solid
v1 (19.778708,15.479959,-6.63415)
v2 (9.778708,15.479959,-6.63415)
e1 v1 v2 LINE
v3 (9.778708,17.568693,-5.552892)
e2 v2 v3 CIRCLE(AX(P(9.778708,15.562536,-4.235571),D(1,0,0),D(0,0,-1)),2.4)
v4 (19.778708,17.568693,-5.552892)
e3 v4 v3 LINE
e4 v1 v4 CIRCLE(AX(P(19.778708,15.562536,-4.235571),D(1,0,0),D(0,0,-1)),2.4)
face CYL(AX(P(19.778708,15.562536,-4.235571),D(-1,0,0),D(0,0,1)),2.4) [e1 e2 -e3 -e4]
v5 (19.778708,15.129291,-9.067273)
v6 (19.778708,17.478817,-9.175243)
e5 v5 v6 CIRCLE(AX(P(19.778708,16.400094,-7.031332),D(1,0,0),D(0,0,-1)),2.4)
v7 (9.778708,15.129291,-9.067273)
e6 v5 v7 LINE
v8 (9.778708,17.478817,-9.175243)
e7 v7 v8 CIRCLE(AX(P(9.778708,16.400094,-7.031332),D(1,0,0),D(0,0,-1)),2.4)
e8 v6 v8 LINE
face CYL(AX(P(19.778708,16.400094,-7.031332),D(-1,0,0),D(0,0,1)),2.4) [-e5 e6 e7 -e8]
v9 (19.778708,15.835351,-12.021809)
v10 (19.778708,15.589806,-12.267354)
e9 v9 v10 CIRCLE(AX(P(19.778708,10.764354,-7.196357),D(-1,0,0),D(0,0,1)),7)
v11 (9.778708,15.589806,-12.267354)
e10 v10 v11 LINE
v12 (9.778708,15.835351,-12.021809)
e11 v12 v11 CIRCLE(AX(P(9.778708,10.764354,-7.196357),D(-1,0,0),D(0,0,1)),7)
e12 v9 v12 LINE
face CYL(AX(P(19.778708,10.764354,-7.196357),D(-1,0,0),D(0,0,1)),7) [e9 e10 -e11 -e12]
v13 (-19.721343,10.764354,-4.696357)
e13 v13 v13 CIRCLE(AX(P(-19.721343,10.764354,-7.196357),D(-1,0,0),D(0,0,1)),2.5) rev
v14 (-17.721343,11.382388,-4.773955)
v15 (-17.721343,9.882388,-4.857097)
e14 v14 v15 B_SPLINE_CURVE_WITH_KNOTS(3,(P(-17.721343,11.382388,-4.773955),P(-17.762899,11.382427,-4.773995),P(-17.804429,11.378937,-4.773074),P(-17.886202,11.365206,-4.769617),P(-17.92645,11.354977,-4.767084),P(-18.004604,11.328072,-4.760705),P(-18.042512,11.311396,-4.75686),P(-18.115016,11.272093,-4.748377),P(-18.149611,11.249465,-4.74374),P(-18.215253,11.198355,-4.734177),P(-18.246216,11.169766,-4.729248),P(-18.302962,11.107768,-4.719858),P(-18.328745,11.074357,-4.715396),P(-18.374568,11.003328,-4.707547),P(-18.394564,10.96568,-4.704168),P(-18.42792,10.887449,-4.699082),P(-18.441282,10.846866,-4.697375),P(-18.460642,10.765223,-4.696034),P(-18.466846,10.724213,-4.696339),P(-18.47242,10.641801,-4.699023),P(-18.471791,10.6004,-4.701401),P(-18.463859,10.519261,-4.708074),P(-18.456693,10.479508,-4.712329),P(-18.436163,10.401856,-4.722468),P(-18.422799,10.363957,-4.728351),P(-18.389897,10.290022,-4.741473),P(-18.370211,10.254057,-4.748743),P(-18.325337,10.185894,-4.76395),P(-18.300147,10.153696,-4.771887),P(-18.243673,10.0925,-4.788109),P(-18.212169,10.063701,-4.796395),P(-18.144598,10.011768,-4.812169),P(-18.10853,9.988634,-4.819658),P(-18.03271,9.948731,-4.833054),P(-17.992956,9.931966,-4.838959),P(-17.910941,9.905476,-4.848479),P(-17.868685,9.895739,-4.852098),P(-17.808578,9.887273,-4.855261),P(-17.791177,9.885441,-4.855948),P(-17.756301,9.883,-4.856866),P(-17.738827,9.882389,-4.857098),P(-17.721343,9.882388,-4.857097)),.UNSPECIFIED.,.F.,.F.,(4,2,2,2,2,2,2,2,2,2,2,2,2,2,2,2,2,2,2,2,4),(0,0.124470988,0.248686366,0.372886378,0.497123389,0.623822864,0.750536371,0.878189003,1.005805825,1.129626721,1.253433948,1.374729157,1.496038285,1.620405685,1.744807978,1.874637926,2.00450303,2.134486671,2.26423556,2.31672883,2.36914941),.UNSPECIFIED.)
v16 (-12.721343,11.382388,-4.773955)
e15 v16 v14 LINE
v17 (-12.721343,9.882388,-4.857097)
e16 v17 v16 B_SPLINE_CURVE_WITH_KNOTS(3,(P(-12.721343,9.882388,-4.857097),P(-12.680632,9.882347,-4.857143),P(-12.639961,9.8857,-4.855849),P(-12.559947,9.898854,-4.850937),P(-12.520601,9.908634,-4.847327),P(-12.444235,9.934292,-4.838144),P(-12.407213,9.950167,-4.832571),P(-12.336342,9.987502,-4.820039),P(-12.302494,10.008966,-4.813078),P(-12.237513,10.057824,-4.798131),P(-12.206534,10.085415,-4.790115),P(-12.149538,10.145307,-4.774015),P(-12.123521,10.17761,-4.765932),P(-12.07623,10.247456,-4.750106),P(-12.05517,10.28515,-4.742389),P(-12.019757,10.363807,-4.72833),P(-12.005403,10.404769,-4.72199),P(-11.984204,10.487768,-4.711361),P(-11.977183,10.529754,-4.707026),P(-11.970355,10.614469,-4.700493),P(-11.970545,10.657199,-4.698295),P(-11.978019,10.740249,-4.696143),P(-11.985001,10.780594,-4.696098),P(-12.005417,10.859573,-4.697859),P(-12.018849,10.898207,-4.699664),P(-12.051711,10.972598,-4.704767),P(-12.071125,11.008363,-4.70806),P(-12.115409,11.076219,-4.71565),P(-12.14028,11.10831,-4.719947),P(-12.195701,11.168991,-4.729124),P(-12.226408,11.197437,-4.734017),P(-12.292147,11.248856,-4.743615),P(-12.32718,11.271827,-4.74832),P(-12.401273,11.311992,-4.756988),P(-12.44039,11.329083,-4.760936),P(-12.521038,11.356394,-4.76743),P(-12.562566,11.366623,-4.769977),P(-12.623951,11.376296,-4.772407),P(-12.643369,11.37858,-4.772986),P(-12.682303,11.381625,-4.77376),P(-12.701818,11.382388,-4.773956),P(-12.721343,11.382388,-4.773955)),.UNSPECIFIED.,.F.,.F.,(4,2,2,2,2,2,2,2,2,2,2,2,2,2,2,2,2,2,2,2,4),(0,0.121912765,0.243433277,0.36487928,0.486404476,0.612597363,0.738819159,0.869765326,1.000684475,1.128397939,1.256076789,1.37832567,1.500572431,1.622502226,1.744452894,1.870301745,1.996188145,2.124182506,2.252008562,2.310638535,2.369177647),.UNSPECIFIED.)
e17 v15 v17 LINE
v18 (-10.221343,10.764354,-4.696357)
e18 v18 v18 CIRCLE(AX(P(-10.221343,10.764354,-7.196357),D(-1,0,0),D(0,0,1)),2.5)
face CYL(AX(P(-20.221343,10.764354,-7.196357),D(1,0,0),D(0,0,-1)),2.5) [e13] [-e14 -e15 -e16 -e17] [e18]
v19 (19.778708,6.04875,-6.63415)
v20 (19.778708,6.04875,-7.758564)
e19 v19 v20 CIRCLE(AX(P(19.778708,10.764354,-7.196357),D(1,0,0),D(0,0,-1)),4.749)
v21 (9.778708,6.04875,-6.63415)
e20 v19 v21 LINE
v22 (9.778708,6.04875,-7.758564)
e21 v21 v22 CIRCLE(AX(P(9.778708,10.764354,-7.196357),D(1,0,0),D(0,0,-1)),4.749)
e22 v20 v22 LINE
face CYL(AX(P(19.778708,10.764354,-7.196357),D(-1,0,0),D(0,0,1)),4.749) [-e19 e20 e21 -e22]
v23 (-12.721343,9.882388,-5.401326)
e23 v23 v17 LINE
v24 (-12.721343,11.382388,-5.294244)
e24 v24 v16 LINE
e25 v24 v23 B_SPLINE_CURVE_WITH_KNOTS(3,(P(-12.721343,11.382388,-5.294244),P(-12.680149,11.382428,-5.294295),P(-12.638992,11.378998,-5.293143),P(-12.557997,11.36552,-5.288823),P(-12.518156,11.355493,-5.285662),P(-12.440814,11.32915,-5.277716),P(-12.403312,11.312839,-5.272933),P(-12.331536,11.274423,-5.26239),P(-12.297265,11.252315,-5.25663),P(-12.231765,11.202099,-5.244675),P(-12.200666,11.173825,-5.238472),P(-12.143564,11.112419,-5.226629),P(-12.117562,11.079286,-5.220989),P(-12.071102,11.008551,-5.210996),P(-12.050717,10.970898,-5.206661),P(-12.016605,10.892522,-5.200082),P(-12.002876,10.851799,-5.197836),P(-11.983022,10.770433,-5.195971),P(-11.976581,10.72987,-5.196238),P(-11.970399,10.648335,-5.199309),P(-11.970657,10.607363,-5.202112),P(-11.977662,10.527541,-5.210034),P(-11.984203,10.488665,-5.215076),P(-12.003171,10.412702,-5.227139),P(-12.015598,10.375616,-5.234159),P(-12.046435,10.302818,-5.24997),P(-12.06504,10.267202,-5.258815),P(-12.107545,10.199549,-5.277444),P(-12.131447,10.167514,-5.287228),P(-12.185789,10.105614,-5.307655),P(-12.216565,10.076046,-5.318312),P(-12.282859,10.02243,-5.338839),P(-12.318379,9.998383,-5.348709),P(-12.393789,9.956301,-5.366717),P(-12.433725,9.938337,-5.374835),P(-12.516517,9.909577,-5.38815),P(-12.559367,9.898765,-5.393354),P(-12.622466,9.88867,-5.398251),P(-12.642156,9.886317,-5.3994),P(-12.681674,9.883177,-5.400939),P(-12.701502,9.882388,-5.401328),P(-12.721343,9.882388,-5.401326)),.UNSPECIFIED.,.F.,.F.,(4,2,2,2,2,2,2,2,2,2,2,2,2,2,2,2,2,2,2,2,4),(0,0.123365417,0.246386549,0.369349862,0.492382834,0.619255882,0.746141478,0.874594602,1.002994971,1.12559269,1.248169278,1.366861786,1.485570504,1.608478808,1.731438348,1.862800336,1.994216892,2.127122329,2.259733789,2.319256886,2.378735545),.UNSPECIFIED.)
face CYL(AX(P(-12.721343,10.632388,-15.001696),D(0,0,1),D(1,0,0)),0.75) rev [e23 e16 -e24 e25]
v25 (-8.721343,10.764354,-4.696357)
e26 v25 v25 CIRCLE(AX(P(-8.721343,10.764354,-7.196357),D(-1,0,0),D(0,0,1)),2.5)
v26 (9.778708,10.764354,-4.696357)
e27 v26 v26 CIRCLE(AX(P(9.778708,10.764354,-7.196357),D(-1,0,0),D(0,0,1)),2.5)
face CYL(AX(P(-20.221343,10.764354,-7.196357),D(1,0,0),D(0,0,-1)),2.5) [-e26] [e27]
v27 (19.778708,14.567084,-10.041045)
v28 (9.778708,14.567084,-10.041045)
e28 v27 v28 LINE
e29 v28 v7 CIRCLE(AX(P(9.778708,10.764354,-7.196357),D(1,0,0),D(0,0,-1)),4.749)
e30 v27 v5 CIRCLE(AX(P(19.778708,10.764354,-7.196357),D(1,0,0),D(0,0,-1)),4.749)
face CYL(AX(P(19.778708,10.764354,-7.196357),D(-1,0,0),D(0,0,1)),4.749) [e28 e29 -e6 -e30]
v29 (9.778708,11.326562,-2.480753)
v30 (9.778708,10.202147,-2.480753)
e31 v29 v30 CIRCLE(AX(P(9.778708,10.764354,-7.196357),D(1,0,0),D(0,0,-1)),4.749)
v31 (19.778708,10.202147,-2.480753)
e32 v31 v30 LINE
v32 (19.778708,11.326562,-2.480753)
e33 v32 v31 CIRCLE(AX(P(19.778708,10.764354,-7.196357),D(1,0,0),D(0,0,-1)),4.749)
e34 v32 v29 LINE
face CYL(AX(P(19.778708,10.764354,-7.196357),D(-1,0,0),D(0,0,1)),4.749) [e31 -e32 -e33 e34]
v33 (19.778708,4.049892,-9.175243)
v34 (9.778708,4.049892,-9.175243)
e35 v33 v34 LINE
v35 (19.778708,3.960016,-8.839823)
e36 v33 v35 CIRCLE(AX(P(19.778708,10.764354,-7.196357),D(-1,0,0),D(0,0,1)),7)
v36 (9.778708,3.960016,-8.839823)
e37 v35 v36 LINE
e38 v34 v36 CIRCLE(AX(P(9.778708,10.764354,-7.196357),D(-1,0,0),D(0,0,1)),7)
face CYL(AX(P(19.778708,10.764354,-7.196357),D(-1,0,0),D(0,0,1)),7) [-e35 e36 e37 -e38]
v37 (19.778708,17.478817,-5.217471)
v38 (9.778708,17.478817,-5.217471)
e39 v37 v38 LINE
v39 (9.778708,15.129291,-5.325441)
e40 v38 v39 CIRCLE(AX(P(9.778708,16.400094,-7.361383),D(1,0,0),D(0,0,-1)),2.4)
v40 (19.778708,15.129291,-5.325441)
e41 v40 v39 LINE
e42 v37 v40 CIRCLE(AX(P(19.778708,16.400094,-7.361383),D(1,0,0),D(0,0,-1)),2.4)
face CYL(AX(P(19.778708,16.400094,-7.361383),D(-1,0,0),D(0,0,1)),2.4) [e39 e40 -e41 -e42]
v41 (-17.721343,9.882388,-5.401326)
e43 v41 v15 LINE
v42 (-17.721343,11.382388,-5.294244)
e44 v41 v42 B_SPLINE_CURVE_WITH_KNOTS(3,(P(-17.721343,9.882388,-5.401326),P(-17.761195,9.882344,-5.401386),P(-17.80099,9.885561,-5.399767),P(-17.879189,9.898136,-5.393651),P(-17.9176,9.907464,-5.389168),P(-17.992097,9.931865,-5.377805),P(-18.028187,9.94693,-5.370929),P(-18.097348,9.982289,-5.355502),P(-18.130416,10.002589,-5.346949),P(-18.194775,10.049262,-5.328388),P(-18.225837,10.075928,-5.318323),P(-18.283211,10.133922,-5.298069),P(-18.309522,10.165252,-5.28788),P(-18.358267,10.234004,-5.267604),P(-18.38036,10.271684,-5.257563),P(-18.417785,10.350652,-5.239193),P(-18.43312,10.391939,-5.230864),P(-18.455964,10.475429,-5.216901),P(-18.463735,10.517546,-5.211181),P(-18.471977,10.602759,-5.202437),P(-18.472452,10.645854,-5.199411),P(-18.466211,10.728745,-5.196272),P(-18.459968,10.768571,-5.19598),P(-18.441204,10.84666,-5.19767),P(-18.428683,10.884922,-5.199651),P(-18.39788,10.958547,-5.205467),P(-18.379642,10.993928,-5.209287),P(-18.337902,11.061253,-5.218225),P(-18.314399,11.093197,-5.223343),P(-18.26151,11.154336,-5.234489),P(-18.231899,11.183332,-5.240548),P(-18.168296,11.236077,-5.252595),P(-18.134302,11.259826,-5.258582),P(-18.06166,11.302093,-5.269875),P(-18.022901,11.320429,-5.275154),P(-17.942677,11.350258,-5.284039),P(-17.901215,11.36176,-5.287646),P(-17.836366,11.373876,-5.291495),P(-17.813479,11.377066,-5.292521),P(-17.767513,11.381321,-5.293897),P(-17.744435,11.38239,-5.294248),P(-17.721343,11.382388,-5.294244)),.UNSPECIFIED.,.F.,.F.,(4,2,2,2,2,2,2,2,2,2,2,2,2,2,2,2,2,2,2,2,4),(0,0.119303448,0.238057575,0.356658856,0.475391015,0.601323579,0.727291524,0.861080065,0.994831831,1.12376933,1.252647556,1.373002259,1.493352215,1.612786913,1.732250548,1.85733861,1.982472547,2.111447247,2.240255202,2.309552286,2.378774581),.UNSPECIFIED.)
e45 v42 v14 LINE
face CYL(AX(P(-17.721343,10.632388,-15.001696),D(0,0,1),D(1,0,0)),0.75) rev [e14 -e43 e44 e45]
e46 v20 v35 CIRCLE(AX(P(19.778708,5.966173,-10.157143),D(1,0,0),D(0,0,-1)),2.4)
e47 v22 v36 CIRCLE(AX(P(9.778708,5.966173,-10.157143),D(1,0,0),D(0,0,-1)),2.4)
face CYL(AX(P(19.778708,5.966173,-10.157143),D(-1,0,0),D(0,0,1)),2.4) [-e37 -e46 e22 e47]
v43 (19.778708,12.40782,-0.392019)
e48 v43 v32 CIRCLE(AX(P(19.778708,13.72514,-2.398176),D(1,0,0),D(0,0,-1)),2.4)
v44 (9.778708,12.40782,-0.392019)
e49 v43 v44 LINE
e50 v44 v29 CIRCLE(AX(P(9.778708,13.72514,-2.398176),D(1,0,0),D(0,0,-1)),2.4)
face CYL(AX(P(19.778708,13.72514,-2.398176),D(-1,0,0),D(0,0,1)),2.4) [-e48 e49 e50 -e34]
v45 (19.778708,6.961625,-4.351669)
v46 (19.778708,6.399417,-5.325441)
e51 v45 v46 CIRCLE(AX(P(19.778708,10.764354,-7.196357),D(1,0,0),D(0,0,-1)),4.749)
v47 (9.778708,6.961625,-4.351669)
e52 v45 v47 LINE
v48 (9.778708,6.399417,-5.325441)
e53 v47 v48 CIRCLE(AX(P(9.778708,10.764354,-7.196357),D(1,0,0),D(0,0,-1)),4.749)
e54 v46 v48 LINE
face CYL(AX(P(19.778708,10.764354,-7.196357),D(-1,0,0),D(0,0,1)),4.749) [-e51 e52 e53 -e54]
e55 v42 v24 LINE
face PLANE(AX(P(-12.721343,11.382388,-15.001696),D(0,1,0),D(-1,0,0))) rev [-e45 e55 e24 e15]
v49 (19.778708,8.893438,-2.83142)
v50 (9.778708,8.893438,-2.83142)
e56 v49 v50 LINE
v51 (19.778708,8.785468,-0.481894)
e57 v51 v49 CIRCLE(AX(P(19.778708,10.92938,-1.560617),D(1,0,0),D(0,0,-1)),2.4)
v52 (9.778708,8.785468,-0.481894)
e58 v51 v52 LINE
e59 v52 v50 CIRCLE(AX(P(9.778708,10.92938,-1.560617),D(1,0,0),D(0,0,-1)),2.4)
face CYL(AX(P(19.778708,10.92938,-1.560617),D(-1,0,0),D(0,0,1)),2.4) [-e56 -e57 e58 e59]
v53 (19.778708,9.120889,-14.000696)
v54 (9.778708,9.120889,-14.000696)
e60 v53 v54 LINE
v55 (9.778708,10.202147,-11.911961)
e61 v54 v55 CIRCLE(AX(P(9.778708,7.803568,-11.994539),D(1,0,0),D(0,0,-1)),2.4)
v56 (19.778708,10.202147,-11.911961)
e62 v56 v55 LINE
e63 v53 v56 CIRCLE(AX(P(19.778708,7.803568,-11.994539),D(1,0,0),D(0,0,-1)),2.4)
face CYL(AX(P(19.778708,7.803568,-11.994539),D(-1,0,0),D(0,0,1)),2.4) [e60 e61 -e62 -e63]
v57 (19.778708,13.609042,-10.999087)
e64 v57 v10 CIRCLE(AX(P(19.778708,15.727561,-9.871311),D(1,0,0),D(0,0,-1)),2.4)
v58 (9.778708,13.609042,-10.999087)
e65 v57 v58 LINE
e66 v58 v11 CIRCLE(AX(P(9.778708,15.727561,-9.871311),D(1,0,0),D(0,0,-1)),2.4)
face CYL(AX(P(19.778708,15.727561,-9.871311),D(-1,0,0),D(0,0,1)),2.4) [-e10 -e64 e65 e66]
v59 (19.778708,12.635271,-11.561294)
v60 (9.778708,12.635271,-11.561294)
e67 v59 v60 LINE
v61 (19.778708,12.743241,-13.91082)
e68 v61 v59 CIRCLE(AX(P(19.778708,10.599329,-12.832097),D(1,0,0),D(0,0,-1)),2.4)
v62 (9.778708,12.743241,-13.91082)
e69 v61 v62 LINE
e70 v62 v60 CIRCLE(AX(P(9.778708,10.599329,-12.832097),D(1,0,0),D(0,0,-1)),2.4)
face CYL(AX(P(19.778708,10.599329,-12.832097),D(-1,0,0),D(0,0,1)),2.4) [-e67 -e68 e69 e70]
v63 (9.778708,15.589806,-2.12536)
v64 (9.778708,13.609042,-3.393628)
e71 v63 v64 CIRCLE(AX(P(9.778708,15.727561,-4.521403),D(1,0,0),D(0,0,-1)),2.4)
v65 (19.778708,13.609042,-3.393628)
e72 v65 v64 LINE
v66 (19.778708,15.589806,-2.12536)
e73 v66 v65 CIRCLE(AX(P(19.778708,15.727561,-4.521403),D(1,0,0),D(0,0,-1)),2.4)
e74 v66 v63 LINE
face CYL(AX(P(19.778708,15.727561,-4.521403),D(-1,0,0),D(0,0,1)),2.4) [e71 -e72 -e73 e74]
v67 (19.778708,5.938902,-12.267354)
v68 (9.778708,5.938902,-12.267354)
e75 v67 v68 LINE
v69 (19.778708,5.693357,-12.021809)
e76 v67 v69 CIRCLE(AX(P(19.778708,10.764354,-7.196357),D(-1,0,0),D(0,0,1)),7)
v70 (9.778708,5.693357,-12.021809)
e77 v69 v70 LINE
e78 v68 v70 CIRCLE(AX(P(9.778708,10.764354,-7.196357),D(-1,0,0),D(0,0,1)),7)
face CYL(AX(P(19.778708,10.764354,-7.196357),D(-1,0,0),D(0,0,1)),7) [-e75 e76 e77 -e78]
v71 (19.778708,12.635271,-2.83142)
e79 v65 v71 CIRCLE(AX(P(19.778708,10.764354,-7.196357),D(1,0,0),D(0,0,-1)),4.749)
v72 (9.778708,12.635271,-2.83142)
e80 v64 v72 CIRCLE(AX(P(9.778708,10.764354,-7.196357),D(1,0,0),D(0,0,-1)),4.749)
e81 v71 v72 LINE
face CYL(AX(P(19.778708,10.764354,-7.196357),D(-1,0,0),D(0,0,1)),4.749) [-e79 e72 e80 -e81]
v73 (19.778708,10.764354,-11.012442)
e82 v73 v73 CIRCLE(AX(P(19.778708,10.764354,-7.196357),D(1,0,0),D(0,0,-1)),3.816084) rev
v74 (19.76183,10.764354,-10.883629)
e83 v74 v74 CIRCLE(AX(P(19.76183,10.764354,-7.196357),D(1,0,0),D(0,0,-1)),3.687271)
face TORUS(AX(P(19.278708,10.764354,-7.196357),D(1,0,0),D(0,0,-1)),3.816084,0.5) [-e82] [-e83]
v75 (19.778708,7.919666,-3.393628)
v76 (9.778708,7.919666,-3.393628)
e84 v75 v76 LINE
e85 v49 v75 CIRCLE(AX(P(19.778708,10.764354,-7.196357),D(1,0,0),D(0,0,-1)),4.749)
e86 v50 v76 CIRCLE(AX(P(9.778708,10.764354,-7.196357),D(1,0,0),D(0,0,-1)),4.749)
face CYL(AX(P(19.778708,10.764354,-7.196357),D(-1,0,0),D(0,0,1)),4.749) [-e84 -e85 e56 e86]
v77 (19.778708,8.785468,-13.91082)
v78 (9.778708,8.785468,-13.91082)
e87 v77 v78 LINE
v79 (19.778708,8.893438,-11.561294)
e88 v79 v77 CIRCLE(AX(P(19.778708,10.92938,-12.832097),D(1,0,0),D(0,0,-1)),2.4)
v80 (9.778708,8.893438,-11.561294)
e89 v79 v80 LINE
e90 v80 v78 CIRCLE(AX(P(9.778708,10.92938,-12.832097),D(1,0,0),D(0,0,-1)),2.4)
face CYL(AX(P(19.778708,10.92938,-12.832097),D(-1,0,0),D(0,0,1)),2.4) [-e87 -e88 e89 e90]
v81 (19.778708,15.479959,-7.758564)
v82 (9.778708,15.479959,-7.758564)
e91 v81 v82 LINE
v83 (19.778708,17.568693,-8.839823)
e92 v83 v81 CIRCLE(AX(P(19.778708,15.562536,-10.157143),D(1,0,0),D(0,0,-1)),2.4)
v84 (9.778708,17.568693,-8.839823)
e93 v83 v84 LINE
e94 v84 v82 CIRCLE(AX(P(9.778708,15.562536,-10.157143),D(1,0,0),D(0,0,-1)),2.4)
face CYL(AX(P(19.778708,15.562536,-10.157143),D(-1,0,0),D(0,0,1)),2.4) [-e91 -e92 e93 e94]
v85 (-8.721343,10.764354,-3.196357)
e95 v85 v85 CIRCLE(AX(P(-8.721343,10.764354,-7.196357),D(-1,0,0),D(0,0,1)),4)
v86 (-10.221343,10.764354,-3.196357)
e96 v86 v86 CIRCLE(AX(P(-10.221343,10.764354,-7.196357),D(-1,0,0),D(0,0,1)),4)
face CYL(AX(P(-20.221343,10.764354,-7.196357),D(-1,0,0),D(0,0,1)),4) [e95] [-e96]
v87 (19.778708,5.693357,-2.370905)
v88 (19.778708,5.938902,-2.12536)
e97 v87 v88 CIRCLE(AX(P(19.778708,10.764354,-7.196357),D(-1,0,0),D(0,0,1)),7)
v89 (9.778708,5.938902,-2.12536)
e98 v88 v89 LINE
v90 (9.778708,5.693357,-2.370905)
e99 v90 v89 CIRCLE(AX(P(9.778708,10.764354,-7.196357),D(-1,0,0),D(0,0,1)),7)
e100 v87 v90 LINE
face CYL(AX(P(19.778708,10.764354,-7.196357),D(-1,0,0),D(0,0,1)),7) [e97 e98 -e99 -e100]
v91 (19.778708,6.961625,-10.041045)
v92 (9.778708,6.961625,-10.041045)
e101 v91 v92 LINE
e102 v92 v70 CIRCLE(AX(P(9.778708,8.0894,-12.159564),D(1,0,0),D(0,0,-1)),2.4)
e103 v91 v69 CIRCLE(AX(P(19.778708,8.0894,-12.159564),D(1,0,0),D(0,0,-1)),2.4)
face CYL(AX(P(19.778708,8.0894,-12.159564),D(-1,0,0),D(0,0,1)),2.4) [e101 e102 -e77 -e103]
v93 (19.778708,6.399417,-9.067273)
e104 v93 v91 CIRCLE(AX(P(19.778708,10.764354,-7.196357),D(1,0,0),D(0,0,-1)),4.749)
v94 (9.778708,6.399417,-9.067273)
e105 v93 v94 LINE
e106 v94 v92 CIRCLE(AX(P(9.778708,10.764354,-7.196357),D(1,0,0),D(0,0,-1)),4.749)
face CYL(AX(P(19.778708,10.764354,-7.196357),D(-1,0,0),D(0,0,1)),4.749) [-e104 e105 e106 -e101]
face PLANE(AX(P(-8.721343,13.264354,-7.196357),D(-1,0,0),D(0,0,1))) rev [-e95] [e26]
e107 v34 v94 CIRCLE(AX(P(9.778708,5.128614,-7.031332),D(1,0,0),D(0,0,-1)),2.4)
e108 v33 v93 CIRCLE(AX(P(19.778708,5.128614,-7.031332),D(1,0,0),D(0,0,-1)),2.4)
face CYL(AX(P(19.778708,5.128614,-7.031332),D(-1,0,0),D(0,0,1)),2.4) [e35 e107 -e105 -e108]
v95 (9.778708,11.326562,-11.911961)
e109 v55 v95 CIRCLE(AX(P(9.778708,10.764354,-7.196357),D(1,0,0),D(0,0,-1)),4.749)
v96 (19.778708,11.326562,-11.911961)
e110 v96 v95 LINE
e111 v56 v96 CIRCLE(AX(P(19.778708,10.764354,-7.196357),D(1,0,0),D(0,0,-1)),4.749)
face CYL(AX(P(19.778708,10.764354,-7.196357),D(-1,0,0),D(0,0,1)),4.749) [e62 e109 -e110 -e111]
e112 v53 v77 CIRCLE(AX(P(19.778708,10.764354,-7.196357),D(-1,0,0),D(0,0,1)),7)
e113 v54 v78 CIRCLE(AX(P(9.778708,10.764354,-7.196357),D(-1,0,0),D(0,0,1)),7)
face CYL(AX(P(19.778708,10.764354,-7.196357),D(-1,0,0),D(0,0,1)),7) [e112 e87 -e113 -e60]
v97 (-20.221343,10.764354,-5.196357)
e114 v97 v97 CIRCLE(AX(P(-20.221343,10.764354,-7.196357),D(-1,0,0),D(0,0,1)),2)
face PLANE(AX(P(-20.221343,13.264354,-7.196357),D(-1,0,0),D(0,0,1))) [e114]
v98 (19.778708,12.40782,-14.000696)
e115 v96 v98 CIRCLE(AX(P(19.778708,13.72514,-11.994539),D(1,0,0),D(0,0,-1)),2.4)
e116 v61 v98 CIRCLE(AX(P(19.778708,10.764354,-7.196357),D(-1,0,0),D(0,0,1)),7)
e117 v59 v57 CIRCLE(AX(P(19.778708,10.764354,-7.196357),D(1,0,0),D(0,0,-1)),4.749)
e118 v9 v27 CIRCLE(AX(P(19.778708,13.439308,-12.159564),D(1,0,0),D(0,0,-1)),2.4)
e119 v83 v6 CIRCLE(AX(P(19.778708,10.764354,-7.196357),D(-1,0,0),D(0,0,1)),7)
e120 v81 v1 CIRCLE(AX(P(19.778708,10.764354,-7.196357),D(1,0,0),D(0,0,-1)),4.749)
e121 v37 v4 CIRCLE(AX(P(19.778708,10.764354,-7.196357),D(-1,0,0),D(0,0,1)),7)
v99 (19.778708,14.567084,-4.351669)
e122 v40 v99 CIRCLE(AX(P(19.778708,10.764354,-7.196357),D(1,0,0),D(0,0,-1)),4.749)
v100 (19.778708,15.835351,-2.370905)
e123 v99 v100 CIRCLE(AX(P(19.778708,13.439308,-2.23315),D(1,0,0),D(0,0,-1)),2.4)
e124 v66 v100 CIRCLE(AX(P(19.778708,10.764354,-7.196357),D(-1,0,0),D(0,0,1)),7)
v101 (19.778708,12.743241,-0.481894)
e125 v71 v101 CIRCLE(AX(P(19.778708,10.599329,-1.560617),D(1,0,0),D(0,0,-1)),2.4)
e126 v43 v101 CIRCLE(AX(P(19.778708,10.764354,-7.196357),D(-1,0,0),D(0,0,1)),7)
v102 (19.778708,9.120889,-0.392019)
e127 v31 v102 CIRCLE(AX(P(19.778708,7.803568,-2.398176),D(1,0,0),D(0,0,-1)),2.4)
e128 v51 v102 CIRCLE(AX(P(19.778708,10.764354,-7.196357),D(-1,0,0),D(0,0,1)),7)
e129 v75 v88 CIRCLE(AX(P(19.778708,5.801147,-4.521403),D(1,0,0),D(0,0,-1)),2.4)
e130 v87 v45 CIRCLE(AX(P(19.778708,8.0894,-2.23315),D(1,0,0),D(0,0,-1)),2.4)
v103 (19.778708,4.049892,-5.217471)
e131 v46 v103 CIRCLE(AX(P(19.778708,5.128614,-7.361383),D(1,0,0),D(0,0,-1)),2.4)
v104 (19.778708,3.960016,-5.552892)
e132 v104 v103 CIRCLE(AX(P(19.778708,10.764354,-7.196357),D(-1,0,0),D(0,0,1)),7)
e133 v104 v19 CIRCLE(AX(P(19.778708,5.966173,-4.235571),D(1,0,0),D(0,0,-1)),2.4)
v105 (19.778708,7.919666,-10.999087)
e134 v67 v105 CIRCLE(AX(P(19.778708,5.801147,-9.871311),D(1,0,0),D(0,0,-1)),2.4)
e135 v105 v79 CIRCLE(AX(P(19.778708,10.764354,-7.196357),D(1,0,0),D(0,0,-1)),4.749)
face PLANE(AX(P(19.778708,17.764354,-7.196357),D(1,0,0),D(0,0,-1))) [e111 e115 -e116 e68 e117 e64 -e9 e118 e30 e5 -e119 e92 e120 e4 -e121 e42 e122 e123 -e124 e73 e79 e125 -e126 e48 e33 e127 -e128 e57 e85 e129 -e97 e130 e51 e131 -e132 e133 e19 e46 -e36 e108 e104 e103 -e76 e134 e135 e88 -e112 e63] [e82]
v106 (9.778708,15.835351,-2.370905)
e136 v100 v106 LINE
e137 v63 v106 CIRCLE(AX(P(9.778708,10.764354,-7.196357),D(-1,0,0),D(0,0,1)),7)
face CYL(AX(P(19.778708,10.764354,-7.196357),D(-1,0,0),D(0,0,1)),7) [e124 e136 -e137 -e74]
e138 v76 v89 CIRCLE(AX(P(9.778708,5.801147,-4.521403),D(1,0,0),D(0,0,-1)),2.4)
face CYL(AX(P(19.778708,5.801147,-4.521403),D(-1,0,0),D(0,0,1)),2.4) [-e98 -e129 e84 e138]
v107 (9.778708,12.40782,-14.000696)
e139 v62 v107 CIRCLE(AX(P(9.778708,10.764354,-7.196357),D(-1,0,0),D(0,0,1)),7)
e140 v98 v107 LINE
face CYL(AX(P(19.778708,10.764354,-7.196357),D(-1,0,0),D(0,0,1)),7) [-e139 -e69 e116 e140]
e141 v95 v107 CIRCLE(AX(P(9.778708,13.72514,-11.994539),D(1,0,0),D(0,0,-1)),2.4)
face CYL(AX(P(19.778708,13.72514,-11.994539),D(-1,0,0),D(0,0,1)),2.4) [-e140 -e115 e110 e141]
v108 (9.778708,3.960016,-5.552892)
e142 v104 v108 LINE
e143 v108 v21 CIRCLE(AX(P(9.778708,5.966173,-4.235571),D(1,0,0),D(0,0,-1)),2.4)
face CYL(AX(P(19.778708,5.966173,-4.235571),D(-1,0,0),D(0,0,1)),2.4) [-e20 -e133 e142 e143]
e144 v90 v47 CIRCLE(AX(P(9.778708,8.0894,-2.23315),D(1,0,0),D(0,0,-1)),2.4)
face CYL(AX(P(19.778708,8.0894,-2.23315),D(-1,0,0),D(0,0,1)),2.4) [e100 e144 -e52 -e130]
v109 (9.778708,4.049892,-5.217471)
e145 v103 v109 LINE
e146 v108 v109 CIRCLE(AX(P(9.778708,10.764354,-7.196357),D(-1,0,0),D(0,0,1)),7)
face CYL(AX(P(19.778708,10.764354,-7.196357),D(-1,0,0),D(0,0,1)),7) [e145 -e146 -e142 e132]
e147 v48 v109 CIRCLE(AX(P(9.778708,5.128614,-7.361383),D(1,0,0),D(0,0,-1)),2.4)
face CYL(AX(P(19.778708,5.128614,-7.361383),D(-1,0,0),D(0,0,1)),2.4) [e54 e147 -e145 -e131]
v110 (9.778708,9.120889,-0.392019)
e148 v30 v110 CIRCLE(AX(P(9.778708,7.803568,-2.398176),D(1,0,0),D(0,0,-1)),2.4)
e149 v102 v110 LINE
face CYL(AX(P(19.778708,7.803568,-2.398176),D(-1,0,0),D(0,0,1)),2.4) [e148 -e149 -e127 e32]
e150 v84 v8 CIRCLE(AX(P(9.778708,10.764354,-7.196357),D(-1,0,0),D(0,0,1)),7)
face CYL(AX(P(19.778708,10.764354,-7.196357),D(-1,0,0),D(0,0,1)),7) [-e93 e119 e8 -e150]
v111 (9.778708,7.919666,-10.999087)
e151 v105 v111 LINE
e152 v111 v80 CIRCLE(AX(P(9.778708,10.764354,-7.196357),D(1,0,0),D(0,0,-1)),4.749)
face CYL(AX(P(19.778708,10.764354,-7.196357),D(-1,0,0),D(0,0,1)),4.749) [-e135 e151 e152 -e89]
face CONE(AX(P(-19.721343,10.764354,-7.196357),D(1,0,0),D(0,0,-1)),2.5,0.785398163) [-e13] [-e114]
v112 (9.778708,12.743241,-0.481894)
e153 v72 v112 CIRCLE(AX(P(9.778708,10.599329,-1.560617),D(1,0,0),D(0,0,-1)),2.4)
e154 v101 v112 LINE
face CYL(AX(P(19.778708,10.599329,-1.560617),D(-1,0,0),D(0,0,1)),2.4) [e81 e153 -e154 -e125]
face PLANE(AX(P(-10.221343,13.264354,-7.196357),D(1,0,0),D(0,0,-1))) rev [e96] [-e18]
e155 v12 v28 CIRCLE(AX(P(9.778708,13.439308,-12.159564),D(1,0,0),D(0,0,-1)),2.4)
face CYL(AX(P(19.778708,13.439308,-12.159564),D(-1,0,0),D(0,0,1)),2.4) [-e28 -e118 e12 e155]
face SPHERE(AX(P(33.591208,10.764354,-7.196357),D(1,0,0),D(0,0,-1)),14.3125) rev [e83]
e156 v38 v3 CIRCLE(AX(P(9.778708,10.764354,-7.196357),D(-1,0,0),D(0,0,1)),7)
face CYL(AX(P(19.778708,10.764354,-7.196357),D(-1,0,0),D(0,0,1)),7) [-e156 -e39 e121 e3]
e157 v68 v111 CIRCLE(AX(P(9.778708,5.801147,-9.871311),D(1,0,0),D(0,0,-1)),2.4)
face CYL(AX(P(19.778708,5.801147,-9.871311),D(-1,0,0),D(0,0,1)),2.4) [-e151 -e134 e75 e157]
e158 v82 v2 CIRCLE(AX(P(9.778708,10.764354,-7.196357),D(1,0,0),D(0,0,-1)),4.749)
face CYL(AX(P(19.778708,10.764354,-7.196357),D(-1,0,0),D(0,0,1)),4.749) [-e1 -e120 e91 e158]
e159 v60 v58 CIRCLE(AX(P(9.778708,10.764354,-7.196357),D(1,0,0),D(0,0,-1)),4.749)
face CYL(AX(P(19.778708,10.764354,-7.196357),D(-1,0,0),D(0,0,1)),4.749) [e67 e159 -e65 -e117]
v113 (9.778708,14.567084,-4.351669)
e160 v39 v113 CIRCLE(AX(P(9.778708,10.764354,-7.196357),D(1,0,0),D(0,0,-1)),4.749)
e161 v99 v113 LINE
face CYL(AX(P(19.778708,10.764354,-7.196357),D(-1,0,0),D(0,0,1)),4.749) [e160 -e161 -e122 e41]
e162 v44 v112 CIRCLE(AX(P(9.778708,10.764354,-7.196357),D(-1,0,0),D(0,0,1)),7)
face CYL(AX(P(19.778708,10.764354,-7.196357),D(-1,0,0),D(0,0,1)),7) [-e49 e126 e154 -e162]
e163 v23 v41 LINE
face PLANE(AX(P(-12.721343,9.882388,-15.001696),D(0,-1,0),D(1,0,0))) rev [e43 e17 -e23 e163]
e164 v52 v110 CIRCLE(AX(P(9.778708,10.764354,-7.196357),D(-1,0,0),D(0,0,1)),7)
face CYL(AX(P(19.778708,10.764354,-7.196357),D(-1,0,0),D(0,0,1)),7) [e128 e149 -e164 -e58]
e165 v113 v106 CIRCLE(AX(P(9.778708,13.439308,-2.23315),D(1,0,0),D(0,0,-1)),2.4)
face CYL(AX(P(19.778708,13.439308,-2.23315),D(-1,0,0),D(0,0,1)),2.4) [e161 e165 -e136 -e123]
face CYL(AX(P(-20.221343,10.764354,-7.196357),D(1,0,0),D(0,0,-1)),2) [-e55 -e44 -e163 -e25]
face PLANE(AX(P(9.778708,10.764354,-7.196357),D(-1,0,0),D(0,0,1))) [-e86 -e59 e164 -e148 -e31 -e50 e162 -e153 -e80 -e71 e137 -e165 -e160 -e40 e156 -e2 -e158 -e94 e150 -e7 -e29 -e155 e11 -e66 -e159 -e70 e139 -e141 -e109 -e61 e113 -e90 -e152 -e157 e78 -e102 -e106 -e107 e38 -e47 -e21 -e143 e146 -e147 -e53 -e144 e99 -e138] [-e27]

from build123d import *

# Parameters (mm, degrees)
SKETCH1_W                  = 10
SKETCH1_H                  = 7
CUT_EXTRUDE1_DEPTH         = 25.841675415
CUT_EXTRUDE2_DEPTH         = 25.841675415
CUT_EXTRUDE3_DEPTH         = 25.841675415
CUT_EXTRUDE4_DEPTH         = 25.841675415
CUT_EXTRUDE5_DEPTH         = 25.841675415
CUT_EXTRUDE6_DEPTH         = 25.841675415
CUT_EXTRUDE7_DEPTH         = 25.841675415
CUT_EXTRUDE8_DEPTH         = 25.841675415
CUT_EXTRUDE9_DEPTH         = 25.73038126
CUT_EXTRUDE10_DEPTH        = 25.73038126
CUT_EXTRUDE11_DEPTH        = 25.73038126
CUT_EXTRUDE12_DEPTH        = 25.590210189
SKETCH14_W                 = 30.0000508
SKETCH14_H                 = 2.5
F_0_8_0_8_DIAMETER_HOLE1_D = 0.8
BOSS_EXTRUDE1_START        = -40.0000508
SKETCH17_R                 = 0.4
BOSS_EXTRUDE1_DEPTH        = 40.0000508
SKETCH18_W                 = 1.5
SKETCH18_H                 = 1.5
CHAMFER1_SIZE              = 0.5
CUT_EXTRUDE13_REACH        = 34.638
CUT_EXTRUDE13_END_RADIUS   = 2
CUT_EXTRUDE13_START        = 5
FILLET1_R                  = 0.5


# Read off the part's stored shape, not the designer's step: Dome1
with BuildPart() as part:
    # Sketch1 → Revolve1 (revolve)
    with BuildSketch(Plane(origin=(0, 0, -7.196357143), x_dir=(-1, 0, 0), z_dir=(0, 0, -1)), mode=Mode.PRIVATE) as revolve1_sk:
        with Locations((-14.77870785, 14.264354232)):
            Rectangle(SKETCH1_W, SKETCH1_H)
    revolve(revolve1_sk.sketch.rotate(Axis((19.77870785, 10.764354232, -7.196357143), (-1, 0, 0)), 270), axis=Axis((19.77870785, 10.764354232, -7.196357143), (-1, 0, 0)))

    # Sketch2 → Cut-Extrude1 (cut, through all)
    with BuildSketch(Plane.ZY.offset(-9.77870785)):
        with BuildLine():
            ThreePointArc((-0.481894482, 12.743240579), (-1.134179317, 14.264354232), (-2.125359964, 15.589806295))
            ThreePointArc((-2.125359964, 15.589806295), (-2.500220073, 14.433413298), (-3.393627672, 13.609042188))
            ThreePointArc((-3.393627672, 13.609042188), (-3.083602501, 13.138854232), (-2.831420372, 12.635270579))
            ThreePointArc((-2.831420372, 12.635270579), (-1.670790249, 12.996798701), (-0.481894482, 12.743240579))
        make_face()
    extrude(amount=-CUT_EXTRUDE1_DEPTH, mode=Mode.SUBTRACT)

    # Sketch3 → Cut-Extrude2 (cut, through all)
    with BuildSketch(Plane.ZY.offset(-9.77870785)):
        with BuildLine():
            ThreePointArc((-0.392018732, 9.12088875), (-0.196357143, 10.764354232), (-0.392018732, 12.407819713))
            ThreePointArc((-0.392018732, 12.407819713), (-1.294853608, 11.593784056), (-2.480752839, 11.326561532))
            ThreePointArc((-2.480752839, 11.326561532), (-2.447357143, 10.764354232), (-2.480752839, 10.202146931))
            ThreePointArc((-2.480752839, 10.202146931), (-1.294853608, 9.934924408), (-0.392018732, 9.12088875))
        make_face()
    extrude(amount=-CUT_EXTRUDE2_DEPTH, mode=Mode.SUBTRACT)

    # Sketch4 → Cut-Extrude3 (cut, through all)
    with BuildSketch(Plane.ZY.offset(-9.77870785)):
        with BuildLine():
            ThreePointArc((-2.125359964, 5.938902169), (-1.134179317, 7.264354232), (-0.481894482, 8.785467884))
            ThreePointArc((-0.481894482, 8.785467884), (-1.670790249, 8.531909762), (-2.831420372, 8.893437884))
            ThreePointArc((-2.831420372, 8.893437884), (-3.083602501, 8.389854232), (-3.393627672, 7.919666275))
            ThreePointArc((-3.393627672, 7.919666275), (-2.500220073, 7.095295166), (-2.125359964, 5.938902169))
        make_face()
    extrude(amount=-CUT_EXTRUDE3_DEPTH, mode=Mode.SUBTRACT)

    # Sketch5 → Cut-Extrude4 (cut, through all)
    with BuildSketch(Plane.ZY.offset(-9.77870785)):
        with BuildLine():
            ThreePointArc((-5.217470795, 4.049891571), (-3.696357143, 4.702176405), (-2.37090508, 5.693357053))
            ThreePointArc((-2.37090508, 5.693357053), (-3.527298077, 6.068217161), (-4.351669187, 6.96162476))
            ThreePointArc((-4.351669187, 6.96162476), (-4.821857143, 6.651599589), (-5.325440796, 6.39941746))
            ThreePointArc((-5.325440796, 6.39941746), (-4.963912674, 5.238787337), (-5.217470795, 4.049891571))
        make_face()
    extrude(amount=-CUT_EXTRUDE4_DEPTH, mode=Mode.SUBTRACT)

    # Sketch6 → Cut-Extrude5 (cut, through all)
    with BuildSketch(Plane.ZY.offset(-9.77870785)):
        with BuildLine():
            ThreePointArc((-8.839822625, 3.960015821), (-7.196357143, 3.764354232), (-5.552891661, 3.960015821))
            ThreePointArc((-5.552891661, 3.960015821), (-6.366927319, 4.862850696), (-6.634149843, 6.048749928))
            ThreePointArc((-6.634149843, 6.048749928), (-7.196357143, 6.015354232), (-7.758564444, 6.048749928))
            ThreePointArc((-7.758564444, 6.048749928), (-8.025786967, 4.862850696), (-8.839822625, 3.960015821))
        make_face()
    extrude(amount=-CUT_EXTRUDE5_DEPTH, mode=Mode.SUBTRACT)

    # Sketch7 → Cut-Extrude6 (cut, through all)
    with BuildSketch(Plane.ZY.offset(-9.77870785)):
        with BuildLine():
            ThreePointArc((-12.021809206, 5.693357053), (-10.696357143, 4.702176405), (-9.175243491, 4.049891571))
            ThreePointArc((-9.175243491, 4.049891571), (-9.428801613, 5.238787337), (-9.067273491, 6.39941746))
            ThreePointArc((-9.067273491, 6.39941746), (-9.570857143, 6.651599589), (-10.0410451, 6.96162476))
            ThreePointArc((-10.0410451, 6.96162476), (-10.865416209, 6.068217161), (-12.021809206, 5.693357053))
        make_face()
    extrude(amount=-CUT_EXTRUDE6_DEPTH, mode=Mode.SUBTRACT)

    # Sketch8 → Cut-Extrude7 (cut, through all)
    with BuildSketch(Plane.ZY.offset(-9.77870785)):
        with BuildLine():
            ThreePointArc((-13.910819804, 8.785467884), (-13.25853497, 7.264354232), (-12.267354322, 5.938902169))
            ThreePointArc((-12.267354322, 5.938902169), (-11.892494213, 7.095295166), (-10.999086614, 7.919666275))
            ThreePointArc((-10.999086614, 7.919666275), (-11.309111786, 8.389854232), (-11.561293915, 8.893437884))
            ThreePointArc((-11.561293915, 8.893437884), (-12.721924037, 8.531909762), (-13.910819804, 8.785467884))
        make_face()
    extrude(amount=-CUT_EXTRUDE7_DEPTH, mode=Mode.SUBTRACT)

    # Sketch9 → Cut-Extrude8 (cut, through all)
    with BuildSketch(Plane.ZY.offset(-9.77870785)):
        with BuildLine():
            ThreePointArc((-14.000695554, 12.407819713), (-14.196357143, 10.764354232), (-14.000695554, 9.12088875))
            ThreePointArc((-14.000695554, 9.12088875), (-13.097860679, 9.934924408), (-11.911961447, 10.202146931))
            ThreePointArc((-11.911961447, 10.202146931), (-11.945357143, 10.764354232), (-11.911961447, 11.326561532))
            ThreePointArc((-11.911961447, 11.326561532), (-13.097860679, 11.593784056), (-14.000695554, 12.407819713))
        make_face()
    extrude(amount=-CUT_EXTRUDE8_DEPTH, mode=Mode.SUBTRACT)

    # Sketch10 → Cut-Extrude9 (cut, through all)
    with BuildSketch(Plane.ZY.offset(-9.77870785)):
        with BuildLine():
            ThreePointArc((-12.267354322, 15.589806295), (-13.25853497, 14.264354232), (-13.910819804, 12.743240579))
            ThreePointArc((-13.910819804, 12.743240579), (-12.721924037, 12.996798701), (-11.561293915, 12.635270579))
            ThreePointArc((-11.561293915, 12.635270579), (-11.309111786, 13.138854232), (-10.999086614, 13.609042188))
            ThreePointArc((-10.999086614, 13.609042188), (-11.892494213, 14.433413298), (-12.267354322, 15.589806295))
        make_face()
    extrude(amount=-CUT_EXTRUDE9_DEPTH, mode=Mode.SUBTRACT)

    # Sketch11 → Cut-Extrude10 (cut, through all)
    with BuildSketch(Plane.ZY.offset(-9.77870785)):
        with BuildLine():
            ThreePointArc((-9.175243491, 17.478816892), (-10.696357143, 16.826532058), (-12.021809206, 15.83535141))
            ThreePointArc((-12.021809206, 15.83535141), (-10.865416209, 15.460491302), (-10.0410451, 14.567083703))
            ThreePointArc((-10.0410451, 14.567083703), (-9.570857143, 14.877108874), (-9.067273491, 15.129291003))
            ThreePointArc((-9.067273491, 15.129291003), (-9.428801613, 16.289921126), (-9.175243491, 17.478816892))
        make_face()
    extrude(amount=-CUT_EXTRUDE10_DEPTH, mode=Mode.SUBTRACT)

    # Sketch12 → Cut-Extrude11 (cut, through all)
    with BuildSketch(Plane.ZY.offset(-9.77870785)):
        with BuildLine():
            ThreePointArc((-5.552891661, 17.568692642), (-7.196357143, 17.764354232), (-8.839822625, 17.568692642))
            ThreePointArc((-8.839822625, 17.568692642), (-8.025786967, 16.665857767), (-7.758564444, 15.479958536))
            ThreePointArc((-7.758564444, 15.479958536), (-7.196357143, 15.513354232), (-6.634149843, 15.479958536))
            ThreePointArc((-6.634149843, 15.479958536), (-6.366927319, 16.665857767), (-5.552891661, 17.568692642))
        make_face()
    extrude(amount=-CUT_EXTRUDE11_DEPTH, mode=Mode.SUBTRACT)

    # Sketch13 → Cut-Extrude12 (cut, through all)
    with BuildSketch(Plane.ZY.offset(-9.77870785)):
        with BuildLine():
            ThreePointArc((-2.37090508, 15.83535141), (-3.696357143, 16.826532058), (-5.217470795, 17.478816892))
            ThreePointArc((-5.217470795, 17.478816892), (-4.963912674, 16.289921126), (-5.325440796, 15.129291003))
            ThreePointArc((-5.325440796, 15.129291003), (-4.821857143, 14.877108874), (-4.351669187, 14.567083703))
            ThreePointArc((-4.351669187, 14.567083703), (-3.527298077, 15.460491302), (-2.37090508, 15.83535141))
        make_face()
    extrude(amount=-CUT_EXTRUDE12_DEPTH, mode=Mode.SUBTRACT)

    # Sketch14 → Revolve2 (revolve)
    with BuildSketch(Plane.XY.offset(-7.196357143), mode=Mode.PRIVATE) as revolve2_sk:
        with Locations((-5.22131755, 12.014354232)):
            Rectangle(SKETCH14_W, SKETCH14_H)
    revolve(revolve2_sk.sketch.rotate(Axis((-20.22134295, 10.764354232, -7.196357143), (1, 0, 0)), 270), axis=Axis((-20.22134295, 10.764354232, -7.196357143), (1, 0, 0)))

    # Ø0.8 (0.8) Diameter Hole1 (through all)
    with Locations(Plane(origin=(19.77870785, 0, 0), x_dir=(0, 0, -1), z_dir=(1, 0, 0))):
        with Locations((7.196357143, 10.764354232)):
            Hole(F_0_8_0_8_DIAMETER_HOLE1_D / 2)

    # Sketch17 → Boss-Extrude1 (add)
    with BuildSketch(Plane(origin=(19.77870785, 0, 0), x_dir=(0, 0, -1), z_dir=(1, 0, 0)).offset(BOSS_EXTRUDE1_START)):
        with Locations((7.196357143, 10.764354232)):
            Circle(SKETCH17_R)
    extrude(amount=BOSS_EXTRUDE1_DEPTH)

    # Sketch18 → Revolve3 (revolve)
    with BuildSketch(Plane.XY.offset(-7.196357143), mode=Mode.PRIVATE) as revolve3_sk:
        with Locations((-9.47134295, 14.014354232)):
            Rectangle(SKETCH18_W, SKETCH18_H)
    revolve(revolve3_sk.sketch.rotate(Axis((-20.22134295, 10.764354232, -7.196357143), (1, 0, 0)), 90), axis=Axis((-20.22134295, 10.764354232, -7.196357143), (1, 0, 0)))

    # Chamfer1
    chamfer1_edges = [part.edges().sort_by_distance(p)[0] for p in [
        (-20.22134295, 10.764354232, -4.696357143),
    ]]
    chamfer(chamfer1_edges, length=CHAMFER1_SIZE)

    # Cut-Extrude13: up to this cylinder (the profile starts outside it)
    cut_extrude13_end = Plane(origin=(-15.221343, 10.764354232, -7.196357143), z_dir=(1, 0, 0)) * Cylinder(CUT_EXTRUDE13_END_RADIUS, 74.276, mode=Mode.PRIVATE)
    # Sketch20 → Cut-Extrude13 (cut, up to the surface)
    with BuildSketch(Plane.XY.offset(-7.196357143).offset(CUT_EXTRUDE13_START), mode=Mode.PRIVATE) as cut_extrude13_sk1:
        with BuildLine():
            Line((-12.72134295, 9.882388481), (-17.72134295, 9.882388481))
            ThreePointArc((-17.72134295, 9.882388481), (-18.47134295, 10.632388481), (-17.72134295, 11.382388481))
            Line((-17.72134295, 11.382388481), (-12.72134295, 11.382388481))
            ThreePointArc((-12.72134295, 11.382388481), (-11.97134295, 10.632388481), (-12.72134295, 9.882388481))
        make_face()
    cut_extrude13_tool1 = extrude(cut_extrude13_sk1.sketch, amount=-CUT_EXTRUDE13_REACH, mode=Mode.PRIVATE) - cut_extrude13_end
    add(cut_extrude13_tool1.solids().sort_by_distance((-15.221343, 10.632388, -2.196357))[0], mode=Mode.SUBTRACT)

    # Dome1 outline → Dome1 (revolve, cut)
    with BuildSketch(Plane(origin=(0, 10.764354232, -7.196357143), x_dir=(0, 1, 0), z_dir=(0, 0, -1))):
        with BuildLine():
            Line((0, 19.778707854), (0, 19.27870785))
            ThreePointArc((0, 19.27870785), (1.891593251, 19.404258523), (3.750000014, 19.778707854))
            Line((3.750000014, 19.778707854), (0, 19.778707854))
        make_face()
    revolve(axis=Axis((0, 10.764354232, -7.196357143), (1, 0, 0)), mode=Mode.SUBTRACT)

    # Fillet1
    fillet1_edges = [part.edges().sort_by_distance(p)[0] for p in [
        (19.778707854, 7.014354218, -7.196357143),
    ]]
    fillet(fillet1_edges, radius=FILLET1_R)


solid = part.part
